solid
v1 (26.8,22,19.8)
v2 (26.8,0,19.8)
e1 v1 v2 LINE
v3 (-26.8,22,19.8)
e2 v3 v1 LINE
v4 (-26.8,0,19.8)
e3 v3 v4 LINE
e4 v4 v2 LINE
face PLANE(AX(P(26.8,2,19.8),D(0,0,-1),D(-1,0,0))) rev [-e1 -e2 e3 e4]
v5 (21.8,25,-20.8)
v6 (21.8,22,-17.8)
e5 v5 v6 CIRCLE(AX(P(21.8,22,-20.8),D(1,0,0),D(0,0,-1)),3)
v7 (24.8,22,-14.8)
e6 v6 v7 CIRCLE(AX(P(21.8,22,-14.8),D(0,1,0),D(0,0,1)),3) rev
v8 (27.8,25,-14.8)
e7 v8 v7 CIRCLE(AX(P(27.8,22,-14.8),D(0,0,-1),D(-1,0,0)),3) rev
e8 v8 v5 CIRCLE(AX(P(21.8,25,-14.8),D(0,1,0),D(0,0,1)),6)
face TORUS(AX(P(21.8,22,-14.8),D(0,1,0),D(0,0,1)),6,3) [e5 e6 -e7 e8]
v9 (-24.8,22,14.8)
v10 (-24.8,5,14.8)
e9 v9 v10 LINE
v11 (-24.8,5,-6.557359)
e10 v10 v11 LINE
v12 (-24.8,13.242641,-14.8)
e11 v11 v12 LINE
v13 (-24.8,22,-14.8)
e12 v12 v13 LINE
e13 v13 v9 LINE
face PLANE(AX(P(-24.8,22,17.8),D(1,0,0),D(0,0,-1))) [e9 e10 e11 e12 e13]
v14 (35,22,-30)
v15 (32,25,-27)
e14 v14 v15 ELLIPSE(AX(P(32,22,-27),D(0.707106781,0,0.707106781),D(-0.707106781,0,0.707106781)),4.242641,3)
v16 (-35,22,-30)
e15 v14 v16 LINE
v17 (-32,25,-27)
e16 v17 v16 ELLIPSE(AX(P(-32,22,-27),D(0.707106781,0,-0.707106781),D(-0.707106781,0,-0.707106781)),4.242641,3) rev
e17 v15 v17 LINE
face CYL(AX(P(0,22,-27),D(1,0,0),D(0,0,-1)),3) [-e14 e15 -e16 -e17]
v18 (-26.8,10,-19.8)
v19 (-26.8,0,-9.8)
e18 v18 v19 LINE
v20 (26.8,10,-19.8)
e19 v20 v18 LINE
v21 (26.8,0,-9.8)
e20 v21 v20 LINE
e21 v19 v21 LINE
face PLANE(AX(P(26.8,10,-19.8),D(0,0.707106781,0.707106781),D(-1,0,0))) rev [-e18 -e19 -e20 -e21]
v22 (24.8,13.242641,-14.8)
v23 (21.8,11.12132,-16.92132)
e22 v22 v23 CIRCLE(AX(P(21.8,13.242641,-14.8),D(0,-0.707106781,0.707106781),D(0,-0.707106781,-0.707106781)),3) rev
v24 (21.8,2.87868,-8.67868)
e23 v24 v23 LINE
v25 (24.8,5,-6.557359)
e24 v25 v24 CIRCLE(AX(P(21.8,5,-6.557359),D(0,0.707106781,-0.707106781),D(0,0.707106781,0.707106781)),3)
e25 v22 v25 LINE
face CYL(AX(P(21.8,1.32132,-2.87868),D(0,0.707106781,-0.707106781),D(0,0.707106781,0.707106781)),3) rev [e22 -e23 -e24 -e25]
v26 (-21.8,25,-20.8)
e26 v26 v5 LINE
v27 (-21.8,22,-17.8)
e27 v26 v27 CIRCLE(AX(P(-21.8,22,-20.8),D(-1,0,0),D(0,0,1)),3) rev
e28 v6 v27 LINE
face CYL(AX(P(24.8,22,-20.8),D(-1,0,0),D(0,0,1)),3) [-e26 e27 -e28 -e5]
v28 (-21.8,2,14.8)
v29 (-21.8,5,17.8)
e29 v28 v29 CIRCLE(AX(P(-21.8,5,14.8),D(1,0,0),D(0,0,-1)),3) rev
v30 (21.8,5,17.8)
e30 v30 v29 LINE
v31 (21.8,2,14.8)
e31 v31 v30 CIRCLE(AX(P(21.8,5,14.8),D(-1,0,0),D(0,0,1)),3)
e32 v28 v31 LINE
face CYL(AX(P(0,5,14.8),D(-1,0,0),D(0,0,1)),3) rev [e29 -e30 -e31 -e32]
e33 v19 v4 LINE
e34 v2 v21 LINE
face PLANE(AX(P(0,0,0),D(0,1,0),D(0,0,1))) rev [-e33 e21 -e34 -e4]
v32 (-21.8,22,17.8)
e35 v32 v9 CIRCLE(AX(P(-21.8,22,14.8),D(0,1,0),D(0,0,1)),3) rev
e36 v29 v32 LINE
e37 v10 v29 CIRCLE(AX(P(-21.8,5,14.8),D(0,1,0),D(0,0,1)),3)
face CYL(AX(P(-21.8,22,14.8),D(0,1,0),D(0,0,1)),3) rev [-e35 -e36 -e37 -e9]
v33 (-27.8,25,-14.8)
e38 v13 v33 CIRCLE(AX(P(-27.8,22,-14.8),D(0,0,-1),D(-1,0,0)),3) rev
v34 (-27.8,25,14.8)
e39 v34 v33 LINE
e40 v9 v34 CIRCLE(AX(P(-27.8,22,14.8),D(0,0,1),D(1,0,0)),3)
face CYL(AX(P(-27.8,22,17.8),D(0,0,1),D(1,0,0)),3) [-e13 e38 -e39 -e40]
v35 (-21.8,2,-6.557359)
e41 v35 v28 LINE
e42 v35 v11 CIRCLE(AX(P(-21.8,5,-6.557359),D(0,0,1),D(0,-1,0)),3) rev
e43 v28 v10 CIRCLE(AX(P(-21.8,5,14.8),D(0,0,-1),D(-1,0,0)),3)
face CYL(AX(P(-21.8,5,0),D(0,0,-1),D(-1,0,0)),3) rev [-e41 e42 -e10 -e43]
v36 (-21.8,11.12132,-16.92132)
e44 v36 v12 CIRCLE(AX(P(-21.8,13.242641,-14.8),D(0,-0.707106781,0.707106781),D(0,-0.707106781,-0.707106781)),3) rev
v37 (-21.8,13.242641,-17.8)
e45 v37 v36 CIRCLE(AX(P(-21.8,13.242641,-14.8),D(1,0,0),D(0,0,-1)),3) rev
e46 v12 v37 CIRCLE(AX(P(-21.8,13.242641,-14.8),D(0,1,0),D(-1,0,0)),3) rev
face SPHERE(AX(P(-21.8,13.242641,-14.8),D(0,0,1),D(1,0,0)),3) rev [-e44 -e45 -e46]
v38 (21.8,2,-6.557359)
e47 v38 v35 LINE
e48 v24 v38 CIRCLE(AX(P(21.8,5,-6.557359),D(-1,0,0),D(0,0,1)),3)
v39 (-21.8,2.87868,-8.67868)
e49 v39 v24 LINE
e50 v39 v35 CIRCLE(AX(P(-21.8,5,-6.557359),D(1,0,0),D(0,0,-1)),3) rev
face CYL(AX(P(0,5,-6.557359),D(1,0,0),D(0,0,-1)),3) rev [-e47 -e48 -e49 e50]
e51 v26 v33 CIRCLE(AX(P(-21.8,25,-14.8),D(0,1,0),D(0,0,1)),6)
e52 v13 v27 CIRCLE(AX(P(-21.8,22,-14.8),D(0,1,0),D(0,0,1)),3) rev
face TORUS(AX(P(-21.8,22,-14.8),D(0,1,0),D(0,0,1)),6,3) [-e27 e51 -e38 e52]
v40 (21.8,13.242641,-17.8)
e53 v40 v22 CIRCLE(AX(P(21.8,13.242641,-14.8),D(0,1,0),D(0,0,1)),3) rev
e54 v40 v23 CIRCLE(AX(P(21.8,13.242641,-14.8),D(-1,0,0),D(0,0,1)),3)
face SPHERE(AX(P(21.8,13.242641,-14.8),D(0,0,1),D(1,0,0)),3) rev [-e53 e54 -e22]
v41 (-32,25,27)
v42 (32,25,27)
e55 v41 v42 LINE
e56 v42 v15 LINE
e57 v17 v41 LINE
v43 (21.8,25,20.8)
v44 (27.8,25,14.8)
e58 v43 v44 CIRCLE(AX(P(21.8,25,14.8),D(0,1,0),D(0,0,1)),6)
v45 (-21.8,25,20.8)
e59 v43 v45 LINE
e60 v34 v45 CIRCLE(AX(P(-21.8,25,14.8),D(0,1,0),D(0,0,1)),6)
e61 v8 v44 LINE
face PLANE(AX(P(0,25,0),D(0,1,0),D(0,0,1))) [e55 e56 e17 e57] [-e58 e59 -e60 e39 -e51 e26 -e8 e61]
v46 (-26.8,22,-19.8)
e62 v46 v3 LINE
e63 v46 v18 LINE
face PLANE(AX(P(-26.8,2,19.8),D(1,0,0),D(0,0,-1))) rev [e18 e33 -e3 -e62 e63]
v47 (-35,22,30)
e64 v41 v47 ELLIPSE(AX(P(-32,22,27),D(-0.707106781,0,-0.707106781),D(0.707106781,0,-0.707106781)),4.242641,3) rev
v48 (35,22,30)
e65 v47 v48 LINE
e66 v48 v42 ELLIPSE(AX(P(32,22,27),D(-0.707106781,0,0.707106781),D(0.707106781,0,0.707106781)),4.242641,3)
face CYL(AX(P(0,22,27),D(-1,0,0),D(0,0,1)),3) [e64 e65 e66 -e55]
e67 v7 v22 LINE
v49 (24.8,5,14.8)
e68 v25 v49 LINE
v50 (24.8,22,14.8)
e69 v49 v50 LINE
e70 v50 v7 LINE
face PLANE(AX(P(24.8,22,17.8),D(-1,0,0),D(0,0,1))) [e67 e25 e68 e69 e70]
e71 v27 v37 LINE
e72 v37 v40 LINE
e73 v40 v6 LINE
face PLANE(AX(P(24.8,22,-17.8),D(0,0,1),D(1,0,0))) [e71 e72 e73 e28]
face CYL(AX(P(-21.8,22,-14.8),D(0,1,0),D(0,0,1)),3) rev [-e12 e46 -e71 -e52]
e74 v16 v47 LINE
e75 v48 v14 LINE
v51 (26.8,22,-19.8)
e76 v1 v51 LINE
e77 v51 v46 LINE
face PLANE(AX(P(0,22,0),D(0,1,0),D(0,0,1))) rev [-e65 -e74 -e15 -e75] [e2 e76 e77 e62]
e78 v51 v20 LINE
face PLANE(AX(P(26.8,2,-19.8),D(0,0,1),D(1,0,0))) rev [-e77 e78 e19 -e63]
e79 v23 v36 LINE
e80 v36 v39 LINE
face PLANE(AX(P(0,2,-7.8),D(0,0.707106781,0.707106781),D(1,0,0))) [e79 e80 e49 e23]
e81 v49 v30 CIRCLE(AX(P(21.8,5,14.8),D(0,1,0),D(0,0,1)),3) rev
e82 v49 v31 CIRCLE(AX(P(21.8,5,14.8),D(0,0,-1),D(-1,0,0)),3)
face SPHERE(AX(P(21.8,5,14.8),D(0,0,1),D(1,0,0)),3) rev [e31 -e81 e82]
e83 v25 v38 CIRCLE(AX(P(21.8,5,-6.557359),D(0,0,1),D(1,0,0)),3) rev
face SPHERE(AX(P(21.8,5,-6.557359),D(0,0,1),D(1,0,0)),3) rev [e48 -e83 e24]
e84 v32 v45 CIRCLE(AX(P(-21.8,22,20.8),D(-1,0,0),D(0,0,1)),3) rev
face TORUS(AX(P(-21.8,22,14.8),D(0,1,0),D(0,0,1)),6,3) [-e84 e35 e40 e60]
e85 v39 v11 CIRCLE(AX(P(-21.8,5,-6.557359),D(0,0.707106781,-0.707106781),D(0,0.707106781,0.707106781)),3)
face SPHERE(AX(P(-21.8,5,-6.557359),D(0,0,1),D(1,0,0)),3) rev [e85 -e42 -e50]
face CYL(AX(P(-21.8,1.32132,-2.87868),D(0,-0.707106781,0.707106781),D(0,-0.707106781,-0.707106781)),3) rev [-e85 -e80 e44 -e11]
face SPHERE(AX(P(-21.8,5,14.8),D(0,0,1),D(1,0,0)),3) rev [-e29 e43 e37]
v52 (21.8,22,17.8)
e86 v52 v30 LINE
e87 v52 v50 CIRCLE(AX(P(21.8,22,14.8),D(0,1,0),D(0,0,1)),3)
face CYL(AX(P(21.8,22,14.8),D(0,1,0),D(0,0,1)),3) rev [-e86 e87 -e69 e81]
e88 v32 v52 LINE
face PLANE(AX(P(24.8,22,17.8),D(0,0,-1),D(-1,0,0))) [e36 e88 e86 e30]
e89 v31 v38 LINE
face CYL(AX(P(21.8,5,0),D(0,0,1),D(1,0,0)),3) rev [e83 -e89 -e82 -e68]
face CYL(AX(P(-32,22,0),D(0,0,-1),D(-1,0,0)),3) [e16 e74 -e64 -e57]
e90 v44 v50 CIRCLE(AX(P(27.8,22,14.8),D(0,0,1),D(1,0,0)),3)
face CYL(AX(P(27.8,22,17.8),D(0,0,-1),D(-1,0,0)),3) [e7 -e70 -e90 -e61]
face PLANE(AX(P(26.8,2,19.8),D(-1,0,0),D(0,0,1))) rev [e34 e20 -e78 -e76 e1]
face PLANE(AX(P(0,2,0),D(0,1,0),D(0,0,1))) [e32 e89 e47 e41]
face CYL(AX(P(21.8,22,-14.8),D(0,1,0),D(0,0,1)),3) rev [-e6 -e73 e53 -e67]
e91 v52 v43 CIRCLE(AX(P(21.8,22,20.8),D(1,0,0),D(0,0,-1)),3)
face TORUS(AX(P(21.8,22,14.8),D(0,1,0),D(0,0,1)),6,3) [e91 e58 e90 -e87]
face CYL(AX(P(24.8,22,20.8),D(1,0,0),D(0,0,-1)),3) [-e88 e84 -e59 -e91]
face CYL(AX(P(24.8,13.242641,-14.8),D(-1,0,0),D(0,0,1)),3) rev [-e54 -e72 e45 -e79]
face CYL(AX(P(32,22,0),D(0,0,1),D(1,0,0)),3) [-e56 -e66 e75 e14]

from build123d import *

# Parameters (mm, degrees)
SKETCH1_W           = 53.6
SKETCH1_H           = 39.6
BOSS_EXTRUDE1_DEPTH = 2
SKETCH2_W           = 53.6
SKETCH2_H           = 39.6
SKETCH2_W_2         = 49.6
SKETCH2_H_2         = 35.6
BOSS_EXTRUDE2_DEPTH = 20
SKETCH3_W           = 70
SKETCH3_H           = 60
SKETCH3_W_2         = 49.6
SKETCH3_H_2         = 35.6
BOSS_EXTRUDE3_DEPTH = 3
CHAMFER1_SIZE       = 10
FILLET1_R           = 3


with BuildPart() as part:
    # Sketch1 → Boss-Extrude1 (new body)
    with BuildSketch(Plane(origin=(0, 0, 0), x_dir=(1, 0, 0), z_dir=(0, 1, 0))):
        Rectangle(SKETCH1_W, SKETCH1_H)
    extrude(amount=BOSS_EXTRUDE1_DEPTH)

    # Sketch2 → Boss-Extrude2 (add)
    with BuildSketch(Plane(origin=(0, 2, 0), x_dir=(1, 0, 0), z_dir=(0, 1, 0))):
        Rectangle(SKETCH2_W, SKETCH2_H)
        Rectangle(SKETCH2_W_2, SKETCH2_H_2, mode=Mode.SUBTRACT)
    extrude(amount=BOSS_EXTRUDE2_DEPTH)

    # Sketch3 → Boss-Extrude3 (add)
    with BuildSketch(Plane(origin=(0, 22, 0), x_dir=(1, 0, 0), z_dir=(0, 1, 0))):
        Rectangle(SKETCH3_W, SKETCH3_H)
        Rectangle(SKETCH3_W_2, SKETCH3_H_2, mode=Mode.SUBTRACT)
    extrude(amount=BOSS_EXTRUDE3_DEPTH)

    # Chamfer1
    chamfer1_edges = [part.edges().sort_by_distance(p)[0] for p in [
        (0, 2, -17.8),
        (0, 0, -19.8),
    ]]
    chamfer(chamfer1_edges, length=CHAMFER1_SIZE)

    # Fillet1
    fillet1_edges = [part.edges().sort_by_distance(p)[0] for p in [
        (24.8, 13.5, 17.8),
        (0, 25, 17.8),
        (-24.8, 13.5, 17.8),
        (0, 2, 17.8),
        (24.8, 18.5, -17.8),
        (-24.8, 18.5, -17.8),
        (24.8, 2, 5),
        (-24.8, 2, 5),
        (24.8, 25, 0),
        (0, 25, -17.8),
        (-24.8, 25, 0),
        (0, 25, 30),
        (0, 25, -30),
        (35, 25, 0),
        (-35, 25, 0),
        (0, 12, -17.8),
        (24.8, 7, -12.8),
        (-24.8, 7, -12.8),
        (0, 2, -7.8),
    ]]
    fillet(fillet1_edges, radius=FILLET1_R - 0.0001)  # a hair under: the kernel refuses the full size


solid = part.part
